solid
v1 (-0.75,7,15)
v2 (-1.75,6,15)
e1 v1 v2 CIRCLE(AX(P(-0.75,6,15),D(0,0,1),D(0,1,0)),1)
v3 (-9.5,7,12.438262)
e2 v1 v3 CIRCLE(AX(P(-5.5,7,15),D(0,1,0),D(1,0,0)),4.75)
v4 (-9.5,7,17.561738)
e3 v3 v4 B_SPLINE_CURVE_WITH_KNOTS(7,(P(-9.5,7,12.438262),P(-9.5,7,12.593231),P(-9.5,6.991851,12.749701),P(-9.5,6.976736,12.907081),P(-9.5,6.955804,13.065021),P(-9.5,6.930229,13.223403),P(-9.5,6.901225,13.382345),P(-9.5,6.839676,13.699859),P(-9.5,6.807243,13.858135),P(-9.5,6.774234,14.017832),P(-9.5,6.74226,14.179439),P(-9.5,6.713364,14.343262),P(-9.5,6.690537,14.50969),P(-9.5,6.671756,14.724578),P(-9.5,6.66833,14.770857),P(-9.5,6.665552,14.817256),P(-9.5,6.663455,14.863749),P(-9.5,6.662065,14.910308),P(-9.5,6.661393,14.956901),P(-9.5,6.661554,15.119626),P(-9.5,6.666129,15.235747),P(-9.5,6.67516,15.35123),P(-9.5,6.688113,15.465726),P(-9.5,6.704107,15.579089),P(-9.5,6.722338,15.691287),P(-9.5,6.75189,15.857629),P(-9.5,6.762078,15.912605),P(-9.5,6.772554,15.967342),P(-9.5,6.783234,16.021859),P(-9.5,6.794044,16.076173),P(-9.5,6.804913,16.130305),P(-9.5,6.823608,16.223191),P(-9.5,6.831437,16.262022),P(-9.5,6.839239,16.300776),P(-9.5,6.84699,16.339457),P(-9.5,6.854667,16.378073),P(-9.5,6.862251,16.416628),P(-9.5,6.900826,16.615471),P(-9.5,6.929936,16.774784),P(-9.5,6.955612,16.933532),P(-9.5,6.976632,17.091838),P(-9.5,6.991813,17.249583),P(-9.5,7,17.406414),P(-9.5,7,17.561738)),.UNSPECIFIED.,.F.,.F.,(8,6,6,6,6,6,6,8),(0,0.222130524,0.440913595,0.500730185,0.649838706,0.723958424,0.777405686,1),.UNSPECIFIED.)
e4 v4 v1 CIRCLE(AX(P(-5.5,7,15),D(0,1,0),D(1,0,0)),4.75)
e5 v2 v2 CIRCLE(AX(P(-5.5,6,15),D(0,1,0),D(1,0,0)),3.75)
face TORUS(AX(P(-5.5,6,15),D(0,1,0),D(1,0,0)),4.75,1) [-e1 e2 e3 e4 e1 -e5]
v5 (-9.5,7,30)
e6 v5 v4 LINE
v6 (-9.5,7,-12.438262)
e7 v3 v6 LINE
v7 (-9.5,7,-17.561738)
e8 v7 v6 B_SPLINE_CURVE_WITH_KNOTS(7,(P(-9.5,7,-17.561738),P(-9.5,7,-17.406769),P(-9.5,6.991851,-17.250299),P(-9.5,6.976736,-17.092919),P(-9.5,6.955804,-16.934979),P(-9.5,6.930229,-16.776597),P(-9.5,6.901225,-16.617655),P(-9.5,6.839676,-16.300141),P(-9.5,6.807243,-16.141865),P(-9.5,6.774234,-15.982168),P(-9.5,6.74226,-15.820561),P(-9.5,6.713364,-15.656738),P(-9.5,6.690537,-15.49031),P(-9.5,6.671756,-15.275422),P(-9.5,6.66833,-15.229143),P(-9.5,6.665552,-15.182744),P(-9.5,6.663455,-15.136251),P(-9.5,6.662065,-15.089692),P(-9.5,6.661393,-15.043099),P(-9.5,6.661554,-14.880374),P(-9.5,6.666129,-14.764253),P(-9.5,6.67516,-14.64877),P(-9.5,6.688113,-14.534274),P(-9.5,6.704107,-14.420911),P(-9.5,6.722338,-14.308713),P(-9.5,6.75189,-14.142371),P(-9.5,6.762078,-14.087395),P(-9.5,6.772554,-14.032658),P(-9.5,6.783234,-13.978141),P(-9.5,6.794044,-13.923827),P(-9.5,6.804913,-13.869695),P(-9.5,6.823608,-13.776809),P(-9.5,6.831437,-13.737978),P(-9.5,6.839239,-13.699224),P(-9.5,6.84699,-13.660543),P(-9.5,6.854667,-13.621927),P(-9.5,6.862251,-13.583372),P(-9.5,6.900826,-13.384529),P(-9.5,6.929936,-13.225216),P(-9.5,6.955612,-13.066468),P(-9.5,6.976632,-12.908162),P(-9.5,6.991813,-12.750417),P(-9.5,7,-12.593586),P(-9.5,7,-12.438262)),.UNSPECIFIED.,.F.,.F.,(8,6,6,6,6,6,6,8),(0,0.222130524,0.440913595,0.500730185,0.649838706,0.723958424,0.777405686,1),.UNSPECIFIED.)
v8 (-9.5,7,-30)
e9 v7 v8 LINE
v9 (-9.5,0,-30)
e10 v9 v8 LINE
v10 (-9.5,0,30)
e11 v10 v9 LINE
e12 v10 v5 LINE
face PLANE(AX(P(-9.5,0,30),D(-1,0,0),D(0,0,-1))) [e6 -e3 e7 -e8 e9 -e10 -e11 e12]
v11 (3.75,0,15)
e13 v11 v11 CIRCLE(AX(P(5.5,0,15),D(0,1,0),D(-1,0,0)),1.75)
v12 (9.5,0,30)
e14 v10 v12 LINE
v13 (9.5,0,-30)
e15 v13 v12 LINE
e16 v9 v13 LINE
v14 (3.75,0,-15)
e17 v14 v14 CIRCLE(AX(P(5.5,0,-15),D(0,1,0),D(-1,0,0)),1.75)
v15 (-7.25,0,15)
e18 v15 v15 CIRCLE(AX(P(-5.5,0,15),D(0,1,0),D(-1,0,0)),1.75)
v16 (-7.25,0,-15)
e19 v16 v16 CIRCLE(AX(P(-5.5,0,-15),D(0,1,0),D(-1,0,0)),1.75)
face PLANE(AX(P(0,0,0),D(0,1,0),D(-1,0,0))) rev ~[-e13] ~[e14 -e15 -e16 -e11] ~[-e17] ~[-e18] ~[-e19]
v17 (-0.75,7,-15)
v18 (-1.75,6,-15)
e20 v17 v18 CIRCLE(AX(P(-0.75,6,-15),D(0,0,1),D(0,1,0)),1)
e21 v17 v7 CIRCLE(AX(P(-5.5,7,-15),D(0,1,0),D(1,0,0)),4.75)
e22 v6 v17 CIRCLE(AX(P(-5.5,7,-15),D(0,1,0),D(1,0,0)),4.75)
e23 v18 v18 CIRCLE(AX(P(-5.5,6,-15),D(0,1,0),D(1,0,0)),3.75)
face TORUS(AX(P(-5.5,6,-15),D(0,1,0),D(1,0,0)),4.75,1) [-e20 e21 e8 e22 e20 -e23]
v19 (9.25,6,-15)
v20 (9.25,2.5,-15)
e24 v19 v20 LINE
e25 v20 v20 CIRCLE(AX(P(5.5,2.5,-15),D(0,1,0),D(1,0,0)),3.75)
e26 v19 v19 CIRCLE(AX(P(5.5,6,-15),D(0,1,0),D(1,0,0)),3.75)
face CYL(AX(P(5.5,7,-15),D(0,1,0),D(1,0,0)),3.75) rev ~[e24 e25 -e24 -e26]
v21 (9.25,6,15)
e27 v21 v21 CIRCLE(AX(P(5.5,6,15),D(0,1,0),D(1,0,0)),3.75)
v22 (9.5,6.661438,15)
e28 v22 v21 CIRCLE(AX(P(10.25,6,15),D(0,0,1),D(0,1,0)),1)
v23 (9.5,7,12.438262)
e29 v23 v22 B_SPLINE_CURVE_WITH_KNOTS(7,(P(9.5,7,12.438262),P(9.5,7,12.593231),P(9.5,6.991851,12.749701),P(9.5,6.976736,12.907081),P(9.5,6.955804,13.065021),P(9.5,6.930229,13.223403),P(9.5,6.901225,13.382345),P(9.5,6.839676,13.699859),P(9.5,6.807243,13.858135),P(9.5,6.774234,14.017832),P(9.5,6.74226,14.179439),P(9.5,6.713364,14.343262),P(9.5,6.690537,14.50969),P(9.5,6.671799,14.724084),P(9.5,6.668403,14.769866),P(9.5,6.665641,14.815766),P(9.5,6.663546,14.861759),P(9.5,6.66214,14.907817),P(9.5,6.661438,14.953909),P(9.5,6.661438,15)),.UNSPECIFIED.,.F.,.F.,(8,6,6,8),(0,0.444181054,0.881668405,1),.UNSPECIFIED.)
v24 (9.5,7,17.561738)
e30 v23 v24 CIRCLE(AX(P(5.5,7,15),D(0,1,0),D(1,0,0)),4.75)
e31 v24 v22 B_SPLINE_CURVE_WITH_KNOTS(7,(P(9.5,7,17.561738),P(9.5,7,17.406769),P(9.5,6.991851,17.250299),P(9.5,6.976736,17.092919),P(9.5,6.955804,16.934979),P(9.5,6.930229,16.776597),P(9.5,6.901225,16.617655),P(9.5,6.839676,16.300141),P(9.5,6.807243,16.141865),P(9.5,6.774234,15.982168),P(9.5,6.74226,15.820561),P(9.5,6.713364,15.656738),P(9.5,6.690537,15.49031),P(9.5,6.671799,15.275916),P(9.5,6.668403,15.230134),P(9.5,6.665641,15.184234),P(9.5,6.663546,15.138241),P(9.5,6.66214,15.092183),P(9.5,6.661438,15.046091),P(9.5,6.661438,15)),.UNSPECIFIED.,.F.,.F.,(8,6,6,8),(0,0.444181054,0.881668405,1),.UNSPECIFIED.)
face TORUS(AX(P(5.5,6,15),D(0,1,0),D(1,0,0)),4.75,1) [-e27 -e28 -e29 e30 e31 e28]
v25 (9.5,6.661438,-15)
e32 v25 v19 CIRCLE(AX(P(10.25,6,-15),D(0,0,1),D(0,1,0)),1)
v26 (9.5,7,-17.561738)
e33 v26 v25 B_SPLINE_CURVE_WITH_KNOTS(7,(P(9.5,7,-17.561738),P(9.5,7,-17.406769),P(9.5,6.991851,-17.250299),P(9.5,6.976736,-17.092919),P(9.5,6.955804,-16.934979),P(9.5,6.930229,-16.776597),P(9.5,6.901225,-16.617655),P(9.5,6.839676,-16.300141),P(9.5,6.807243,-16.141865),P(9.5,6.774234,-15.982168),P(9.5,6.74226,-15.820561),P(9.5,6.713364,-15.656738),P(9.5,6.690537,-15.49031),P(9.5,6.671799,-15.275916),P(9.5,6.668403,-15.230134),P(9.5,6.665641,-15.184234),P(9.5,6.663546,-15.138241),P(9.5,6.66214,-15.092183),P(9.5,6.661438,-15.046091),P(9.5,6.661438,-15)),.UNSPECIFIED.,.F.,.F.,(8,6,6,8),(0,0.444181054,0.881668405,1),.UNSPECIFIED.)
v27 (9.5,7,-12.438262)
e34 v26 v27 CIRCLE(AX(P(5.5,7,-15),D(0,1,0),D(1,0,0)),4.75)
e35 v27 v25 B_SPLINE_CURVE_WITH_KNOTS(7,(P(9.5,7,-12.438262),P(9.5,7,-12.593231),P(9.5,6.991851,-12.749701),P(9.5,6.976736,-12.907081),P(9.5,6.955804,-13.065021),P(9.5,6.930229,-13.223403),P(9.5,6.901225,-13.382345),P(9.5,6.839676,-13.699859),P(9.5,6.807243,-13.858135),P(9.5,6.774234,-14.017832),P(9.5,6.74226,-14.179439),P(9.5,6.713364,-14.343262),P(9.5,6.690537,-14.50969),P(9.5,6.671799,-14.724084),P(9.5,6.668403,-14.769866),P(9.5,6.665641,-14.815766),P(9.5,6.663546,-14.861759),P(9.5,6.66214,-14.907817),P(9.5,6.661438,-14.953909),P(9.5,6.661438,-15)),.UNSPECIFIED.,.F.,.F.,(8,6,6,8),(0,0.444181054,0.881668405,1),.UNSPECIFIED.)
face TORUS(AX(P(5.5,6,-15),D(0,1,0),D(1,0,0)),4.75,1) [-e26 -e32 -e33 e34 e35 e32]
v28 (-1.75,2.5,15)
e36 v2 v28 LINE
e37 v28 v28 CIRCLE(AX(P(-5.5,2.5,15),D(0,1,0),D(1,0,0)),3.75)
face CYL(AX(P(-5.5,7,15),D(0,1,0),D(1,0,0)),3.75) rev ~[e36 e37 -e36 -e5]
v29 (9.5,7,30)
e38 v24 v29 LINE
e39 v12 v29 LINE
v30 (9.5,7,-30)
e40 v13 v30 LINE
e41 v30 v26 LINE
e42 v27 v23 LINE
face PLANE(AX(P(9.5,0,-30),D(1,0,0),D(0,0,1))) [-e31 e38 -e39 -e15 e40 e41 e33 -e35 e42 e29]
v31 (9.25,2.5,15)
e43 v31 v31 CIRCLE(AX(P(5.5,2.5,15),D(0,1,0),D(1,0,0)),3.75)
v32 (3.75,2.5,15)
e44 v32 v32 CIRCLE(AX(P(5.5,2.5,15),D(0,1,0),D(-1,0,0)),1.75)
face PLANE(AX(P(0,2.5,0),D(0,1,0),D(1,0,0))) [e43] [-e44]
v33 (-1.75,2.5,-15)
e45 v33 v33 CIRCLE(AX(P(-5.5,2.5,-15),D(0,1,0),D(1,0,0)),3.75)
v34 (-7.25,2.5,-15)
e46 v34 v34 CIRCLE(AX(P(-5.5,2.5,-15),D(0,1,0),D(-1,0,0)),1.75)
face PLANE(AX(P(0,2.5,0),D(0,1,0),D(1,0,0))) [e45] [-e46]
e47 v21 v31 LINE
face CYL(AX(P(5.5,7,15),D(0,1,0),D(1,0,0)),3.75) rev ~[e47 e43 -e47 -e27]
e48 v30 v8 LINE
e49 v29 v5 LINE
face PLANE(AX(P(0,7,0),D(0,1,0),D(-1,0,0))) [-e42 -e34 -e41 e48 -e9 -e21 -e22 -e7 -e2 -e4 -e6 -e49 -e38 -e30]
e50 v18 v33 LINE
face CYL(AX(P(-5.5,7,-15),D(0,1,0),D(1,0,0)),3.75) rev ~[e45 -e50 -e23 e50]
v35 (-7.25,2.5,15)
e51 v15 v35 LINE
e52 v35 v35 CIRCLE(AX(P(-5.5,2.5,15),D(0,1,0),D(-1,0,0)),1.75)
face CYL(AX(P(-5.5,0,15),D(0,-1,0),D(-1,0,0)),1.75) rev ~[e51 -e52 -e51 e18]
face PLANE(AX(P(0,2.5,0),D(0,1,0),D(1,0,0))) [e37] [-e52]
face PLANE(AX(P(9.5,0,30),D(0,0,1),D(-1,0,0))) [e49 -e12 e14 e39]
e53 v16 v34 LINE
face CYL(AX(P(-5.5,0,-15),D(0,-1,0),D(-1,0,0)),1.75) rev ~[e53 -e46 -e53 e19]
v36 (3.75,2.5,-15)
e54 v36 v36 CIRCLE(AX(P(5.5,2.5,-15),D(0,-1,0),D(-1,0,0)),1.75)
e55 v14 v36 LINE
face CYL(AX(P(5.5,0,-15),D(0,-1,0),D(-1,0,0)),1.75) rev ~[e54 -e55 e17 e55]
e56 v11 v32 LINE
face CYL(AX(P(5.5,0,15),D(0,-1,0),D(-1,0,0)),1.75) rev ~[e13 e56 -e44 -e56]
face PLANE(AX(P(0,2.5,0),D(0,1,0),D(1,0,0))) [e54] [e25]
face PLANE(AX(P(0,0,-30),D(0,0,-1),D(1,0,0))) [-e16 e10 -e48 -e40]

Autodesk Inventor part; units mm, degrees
ref_plane "YZ Plane" through (0, 0, 0) normal (1, 0, 0) x (0, 1, 0)
ref_plane "XZ Plane" through (0, 0, 0) normal (0, 1, 0) x (-1, 0, 0)
ref_plane "XY Plane" through (0, 0, 0) normal (0, 0, 1) x (1, 0, 0)
sketch "Esquisse1" plane through (0, 0, 0) normal (0, 1, 0) x (-1, 0, 0)
  line L0 (-9.5, 30) -> (9.5, 30)
  line L1 (9.5, 30) -> (9.5, -30)
  line L2 (9.5, -30) -> (-9.5, -30)
  line L3 (-9.5, -30) -> (-9.5, 30)
  line L4 (-9.5, 30) -> (9.5, -30) construction
  line L5 (9.5, 30) -> (-9.5, -30) construction
  circle A0 centre (5.5, 15) radius 1.75
  circle A1 centre (5.5, -15) radius 1.75
  line L6 (0, 32.5338) -> (0, -37.7206)
  circle A2 centre (-5.5, 15) radius 1.75
  circle A3 centre (-5.5, -15) radius 1.75
  point P0 (0, 0)
  dimension "d0" = 19
  dimension "d1" = 60
  dimension "d2" = 15
  dimension "d3" = 15
  dimension "d4" = 3.5
  dimension "d11" = 4
  dimension "d12" = 4
extrude "Extrusion1" add sketch "Esquisse1" along normal blind 7
sketch "Esquisse2" plane through (0, 7, 0) normal (0, 1, 0) x (1, 0, 0)
  circle A0 centre (-5.5, -15) radius 1.75 projected
  circle A1 centre (-5.5, -15) radius 3.75
  circle A2 centre (-5.5, 15) radius 1.75 projected
  circle A3 centre (-5.5, 15) radius 3.75
  line L0 (0, -33.1726) -> (0, 42.5186)
  circle A4 centre (5.5, -15) radius 1.75
  circle A5 centre (5.5, -15) radius 3.75
  circle A6 centre (5.5, 15) radius 1.75
  circle A7 centre (5.5, 15) radius 3.75
  point P0 (0, 0)
  dimension "d7" = 7.5
extrude "Extrusion2" cut sketch "Esquisse2" against normal blind 4.5 contours A1 | A3 | A5 | A6 | A7
fillet "Congé2" radius 1 4 edges at (-9.25, 7, -15) (1.75, 7, -15) (-9.25, 7, 15) (1.75, 7, 15)
properties part number "attache_cadre"
